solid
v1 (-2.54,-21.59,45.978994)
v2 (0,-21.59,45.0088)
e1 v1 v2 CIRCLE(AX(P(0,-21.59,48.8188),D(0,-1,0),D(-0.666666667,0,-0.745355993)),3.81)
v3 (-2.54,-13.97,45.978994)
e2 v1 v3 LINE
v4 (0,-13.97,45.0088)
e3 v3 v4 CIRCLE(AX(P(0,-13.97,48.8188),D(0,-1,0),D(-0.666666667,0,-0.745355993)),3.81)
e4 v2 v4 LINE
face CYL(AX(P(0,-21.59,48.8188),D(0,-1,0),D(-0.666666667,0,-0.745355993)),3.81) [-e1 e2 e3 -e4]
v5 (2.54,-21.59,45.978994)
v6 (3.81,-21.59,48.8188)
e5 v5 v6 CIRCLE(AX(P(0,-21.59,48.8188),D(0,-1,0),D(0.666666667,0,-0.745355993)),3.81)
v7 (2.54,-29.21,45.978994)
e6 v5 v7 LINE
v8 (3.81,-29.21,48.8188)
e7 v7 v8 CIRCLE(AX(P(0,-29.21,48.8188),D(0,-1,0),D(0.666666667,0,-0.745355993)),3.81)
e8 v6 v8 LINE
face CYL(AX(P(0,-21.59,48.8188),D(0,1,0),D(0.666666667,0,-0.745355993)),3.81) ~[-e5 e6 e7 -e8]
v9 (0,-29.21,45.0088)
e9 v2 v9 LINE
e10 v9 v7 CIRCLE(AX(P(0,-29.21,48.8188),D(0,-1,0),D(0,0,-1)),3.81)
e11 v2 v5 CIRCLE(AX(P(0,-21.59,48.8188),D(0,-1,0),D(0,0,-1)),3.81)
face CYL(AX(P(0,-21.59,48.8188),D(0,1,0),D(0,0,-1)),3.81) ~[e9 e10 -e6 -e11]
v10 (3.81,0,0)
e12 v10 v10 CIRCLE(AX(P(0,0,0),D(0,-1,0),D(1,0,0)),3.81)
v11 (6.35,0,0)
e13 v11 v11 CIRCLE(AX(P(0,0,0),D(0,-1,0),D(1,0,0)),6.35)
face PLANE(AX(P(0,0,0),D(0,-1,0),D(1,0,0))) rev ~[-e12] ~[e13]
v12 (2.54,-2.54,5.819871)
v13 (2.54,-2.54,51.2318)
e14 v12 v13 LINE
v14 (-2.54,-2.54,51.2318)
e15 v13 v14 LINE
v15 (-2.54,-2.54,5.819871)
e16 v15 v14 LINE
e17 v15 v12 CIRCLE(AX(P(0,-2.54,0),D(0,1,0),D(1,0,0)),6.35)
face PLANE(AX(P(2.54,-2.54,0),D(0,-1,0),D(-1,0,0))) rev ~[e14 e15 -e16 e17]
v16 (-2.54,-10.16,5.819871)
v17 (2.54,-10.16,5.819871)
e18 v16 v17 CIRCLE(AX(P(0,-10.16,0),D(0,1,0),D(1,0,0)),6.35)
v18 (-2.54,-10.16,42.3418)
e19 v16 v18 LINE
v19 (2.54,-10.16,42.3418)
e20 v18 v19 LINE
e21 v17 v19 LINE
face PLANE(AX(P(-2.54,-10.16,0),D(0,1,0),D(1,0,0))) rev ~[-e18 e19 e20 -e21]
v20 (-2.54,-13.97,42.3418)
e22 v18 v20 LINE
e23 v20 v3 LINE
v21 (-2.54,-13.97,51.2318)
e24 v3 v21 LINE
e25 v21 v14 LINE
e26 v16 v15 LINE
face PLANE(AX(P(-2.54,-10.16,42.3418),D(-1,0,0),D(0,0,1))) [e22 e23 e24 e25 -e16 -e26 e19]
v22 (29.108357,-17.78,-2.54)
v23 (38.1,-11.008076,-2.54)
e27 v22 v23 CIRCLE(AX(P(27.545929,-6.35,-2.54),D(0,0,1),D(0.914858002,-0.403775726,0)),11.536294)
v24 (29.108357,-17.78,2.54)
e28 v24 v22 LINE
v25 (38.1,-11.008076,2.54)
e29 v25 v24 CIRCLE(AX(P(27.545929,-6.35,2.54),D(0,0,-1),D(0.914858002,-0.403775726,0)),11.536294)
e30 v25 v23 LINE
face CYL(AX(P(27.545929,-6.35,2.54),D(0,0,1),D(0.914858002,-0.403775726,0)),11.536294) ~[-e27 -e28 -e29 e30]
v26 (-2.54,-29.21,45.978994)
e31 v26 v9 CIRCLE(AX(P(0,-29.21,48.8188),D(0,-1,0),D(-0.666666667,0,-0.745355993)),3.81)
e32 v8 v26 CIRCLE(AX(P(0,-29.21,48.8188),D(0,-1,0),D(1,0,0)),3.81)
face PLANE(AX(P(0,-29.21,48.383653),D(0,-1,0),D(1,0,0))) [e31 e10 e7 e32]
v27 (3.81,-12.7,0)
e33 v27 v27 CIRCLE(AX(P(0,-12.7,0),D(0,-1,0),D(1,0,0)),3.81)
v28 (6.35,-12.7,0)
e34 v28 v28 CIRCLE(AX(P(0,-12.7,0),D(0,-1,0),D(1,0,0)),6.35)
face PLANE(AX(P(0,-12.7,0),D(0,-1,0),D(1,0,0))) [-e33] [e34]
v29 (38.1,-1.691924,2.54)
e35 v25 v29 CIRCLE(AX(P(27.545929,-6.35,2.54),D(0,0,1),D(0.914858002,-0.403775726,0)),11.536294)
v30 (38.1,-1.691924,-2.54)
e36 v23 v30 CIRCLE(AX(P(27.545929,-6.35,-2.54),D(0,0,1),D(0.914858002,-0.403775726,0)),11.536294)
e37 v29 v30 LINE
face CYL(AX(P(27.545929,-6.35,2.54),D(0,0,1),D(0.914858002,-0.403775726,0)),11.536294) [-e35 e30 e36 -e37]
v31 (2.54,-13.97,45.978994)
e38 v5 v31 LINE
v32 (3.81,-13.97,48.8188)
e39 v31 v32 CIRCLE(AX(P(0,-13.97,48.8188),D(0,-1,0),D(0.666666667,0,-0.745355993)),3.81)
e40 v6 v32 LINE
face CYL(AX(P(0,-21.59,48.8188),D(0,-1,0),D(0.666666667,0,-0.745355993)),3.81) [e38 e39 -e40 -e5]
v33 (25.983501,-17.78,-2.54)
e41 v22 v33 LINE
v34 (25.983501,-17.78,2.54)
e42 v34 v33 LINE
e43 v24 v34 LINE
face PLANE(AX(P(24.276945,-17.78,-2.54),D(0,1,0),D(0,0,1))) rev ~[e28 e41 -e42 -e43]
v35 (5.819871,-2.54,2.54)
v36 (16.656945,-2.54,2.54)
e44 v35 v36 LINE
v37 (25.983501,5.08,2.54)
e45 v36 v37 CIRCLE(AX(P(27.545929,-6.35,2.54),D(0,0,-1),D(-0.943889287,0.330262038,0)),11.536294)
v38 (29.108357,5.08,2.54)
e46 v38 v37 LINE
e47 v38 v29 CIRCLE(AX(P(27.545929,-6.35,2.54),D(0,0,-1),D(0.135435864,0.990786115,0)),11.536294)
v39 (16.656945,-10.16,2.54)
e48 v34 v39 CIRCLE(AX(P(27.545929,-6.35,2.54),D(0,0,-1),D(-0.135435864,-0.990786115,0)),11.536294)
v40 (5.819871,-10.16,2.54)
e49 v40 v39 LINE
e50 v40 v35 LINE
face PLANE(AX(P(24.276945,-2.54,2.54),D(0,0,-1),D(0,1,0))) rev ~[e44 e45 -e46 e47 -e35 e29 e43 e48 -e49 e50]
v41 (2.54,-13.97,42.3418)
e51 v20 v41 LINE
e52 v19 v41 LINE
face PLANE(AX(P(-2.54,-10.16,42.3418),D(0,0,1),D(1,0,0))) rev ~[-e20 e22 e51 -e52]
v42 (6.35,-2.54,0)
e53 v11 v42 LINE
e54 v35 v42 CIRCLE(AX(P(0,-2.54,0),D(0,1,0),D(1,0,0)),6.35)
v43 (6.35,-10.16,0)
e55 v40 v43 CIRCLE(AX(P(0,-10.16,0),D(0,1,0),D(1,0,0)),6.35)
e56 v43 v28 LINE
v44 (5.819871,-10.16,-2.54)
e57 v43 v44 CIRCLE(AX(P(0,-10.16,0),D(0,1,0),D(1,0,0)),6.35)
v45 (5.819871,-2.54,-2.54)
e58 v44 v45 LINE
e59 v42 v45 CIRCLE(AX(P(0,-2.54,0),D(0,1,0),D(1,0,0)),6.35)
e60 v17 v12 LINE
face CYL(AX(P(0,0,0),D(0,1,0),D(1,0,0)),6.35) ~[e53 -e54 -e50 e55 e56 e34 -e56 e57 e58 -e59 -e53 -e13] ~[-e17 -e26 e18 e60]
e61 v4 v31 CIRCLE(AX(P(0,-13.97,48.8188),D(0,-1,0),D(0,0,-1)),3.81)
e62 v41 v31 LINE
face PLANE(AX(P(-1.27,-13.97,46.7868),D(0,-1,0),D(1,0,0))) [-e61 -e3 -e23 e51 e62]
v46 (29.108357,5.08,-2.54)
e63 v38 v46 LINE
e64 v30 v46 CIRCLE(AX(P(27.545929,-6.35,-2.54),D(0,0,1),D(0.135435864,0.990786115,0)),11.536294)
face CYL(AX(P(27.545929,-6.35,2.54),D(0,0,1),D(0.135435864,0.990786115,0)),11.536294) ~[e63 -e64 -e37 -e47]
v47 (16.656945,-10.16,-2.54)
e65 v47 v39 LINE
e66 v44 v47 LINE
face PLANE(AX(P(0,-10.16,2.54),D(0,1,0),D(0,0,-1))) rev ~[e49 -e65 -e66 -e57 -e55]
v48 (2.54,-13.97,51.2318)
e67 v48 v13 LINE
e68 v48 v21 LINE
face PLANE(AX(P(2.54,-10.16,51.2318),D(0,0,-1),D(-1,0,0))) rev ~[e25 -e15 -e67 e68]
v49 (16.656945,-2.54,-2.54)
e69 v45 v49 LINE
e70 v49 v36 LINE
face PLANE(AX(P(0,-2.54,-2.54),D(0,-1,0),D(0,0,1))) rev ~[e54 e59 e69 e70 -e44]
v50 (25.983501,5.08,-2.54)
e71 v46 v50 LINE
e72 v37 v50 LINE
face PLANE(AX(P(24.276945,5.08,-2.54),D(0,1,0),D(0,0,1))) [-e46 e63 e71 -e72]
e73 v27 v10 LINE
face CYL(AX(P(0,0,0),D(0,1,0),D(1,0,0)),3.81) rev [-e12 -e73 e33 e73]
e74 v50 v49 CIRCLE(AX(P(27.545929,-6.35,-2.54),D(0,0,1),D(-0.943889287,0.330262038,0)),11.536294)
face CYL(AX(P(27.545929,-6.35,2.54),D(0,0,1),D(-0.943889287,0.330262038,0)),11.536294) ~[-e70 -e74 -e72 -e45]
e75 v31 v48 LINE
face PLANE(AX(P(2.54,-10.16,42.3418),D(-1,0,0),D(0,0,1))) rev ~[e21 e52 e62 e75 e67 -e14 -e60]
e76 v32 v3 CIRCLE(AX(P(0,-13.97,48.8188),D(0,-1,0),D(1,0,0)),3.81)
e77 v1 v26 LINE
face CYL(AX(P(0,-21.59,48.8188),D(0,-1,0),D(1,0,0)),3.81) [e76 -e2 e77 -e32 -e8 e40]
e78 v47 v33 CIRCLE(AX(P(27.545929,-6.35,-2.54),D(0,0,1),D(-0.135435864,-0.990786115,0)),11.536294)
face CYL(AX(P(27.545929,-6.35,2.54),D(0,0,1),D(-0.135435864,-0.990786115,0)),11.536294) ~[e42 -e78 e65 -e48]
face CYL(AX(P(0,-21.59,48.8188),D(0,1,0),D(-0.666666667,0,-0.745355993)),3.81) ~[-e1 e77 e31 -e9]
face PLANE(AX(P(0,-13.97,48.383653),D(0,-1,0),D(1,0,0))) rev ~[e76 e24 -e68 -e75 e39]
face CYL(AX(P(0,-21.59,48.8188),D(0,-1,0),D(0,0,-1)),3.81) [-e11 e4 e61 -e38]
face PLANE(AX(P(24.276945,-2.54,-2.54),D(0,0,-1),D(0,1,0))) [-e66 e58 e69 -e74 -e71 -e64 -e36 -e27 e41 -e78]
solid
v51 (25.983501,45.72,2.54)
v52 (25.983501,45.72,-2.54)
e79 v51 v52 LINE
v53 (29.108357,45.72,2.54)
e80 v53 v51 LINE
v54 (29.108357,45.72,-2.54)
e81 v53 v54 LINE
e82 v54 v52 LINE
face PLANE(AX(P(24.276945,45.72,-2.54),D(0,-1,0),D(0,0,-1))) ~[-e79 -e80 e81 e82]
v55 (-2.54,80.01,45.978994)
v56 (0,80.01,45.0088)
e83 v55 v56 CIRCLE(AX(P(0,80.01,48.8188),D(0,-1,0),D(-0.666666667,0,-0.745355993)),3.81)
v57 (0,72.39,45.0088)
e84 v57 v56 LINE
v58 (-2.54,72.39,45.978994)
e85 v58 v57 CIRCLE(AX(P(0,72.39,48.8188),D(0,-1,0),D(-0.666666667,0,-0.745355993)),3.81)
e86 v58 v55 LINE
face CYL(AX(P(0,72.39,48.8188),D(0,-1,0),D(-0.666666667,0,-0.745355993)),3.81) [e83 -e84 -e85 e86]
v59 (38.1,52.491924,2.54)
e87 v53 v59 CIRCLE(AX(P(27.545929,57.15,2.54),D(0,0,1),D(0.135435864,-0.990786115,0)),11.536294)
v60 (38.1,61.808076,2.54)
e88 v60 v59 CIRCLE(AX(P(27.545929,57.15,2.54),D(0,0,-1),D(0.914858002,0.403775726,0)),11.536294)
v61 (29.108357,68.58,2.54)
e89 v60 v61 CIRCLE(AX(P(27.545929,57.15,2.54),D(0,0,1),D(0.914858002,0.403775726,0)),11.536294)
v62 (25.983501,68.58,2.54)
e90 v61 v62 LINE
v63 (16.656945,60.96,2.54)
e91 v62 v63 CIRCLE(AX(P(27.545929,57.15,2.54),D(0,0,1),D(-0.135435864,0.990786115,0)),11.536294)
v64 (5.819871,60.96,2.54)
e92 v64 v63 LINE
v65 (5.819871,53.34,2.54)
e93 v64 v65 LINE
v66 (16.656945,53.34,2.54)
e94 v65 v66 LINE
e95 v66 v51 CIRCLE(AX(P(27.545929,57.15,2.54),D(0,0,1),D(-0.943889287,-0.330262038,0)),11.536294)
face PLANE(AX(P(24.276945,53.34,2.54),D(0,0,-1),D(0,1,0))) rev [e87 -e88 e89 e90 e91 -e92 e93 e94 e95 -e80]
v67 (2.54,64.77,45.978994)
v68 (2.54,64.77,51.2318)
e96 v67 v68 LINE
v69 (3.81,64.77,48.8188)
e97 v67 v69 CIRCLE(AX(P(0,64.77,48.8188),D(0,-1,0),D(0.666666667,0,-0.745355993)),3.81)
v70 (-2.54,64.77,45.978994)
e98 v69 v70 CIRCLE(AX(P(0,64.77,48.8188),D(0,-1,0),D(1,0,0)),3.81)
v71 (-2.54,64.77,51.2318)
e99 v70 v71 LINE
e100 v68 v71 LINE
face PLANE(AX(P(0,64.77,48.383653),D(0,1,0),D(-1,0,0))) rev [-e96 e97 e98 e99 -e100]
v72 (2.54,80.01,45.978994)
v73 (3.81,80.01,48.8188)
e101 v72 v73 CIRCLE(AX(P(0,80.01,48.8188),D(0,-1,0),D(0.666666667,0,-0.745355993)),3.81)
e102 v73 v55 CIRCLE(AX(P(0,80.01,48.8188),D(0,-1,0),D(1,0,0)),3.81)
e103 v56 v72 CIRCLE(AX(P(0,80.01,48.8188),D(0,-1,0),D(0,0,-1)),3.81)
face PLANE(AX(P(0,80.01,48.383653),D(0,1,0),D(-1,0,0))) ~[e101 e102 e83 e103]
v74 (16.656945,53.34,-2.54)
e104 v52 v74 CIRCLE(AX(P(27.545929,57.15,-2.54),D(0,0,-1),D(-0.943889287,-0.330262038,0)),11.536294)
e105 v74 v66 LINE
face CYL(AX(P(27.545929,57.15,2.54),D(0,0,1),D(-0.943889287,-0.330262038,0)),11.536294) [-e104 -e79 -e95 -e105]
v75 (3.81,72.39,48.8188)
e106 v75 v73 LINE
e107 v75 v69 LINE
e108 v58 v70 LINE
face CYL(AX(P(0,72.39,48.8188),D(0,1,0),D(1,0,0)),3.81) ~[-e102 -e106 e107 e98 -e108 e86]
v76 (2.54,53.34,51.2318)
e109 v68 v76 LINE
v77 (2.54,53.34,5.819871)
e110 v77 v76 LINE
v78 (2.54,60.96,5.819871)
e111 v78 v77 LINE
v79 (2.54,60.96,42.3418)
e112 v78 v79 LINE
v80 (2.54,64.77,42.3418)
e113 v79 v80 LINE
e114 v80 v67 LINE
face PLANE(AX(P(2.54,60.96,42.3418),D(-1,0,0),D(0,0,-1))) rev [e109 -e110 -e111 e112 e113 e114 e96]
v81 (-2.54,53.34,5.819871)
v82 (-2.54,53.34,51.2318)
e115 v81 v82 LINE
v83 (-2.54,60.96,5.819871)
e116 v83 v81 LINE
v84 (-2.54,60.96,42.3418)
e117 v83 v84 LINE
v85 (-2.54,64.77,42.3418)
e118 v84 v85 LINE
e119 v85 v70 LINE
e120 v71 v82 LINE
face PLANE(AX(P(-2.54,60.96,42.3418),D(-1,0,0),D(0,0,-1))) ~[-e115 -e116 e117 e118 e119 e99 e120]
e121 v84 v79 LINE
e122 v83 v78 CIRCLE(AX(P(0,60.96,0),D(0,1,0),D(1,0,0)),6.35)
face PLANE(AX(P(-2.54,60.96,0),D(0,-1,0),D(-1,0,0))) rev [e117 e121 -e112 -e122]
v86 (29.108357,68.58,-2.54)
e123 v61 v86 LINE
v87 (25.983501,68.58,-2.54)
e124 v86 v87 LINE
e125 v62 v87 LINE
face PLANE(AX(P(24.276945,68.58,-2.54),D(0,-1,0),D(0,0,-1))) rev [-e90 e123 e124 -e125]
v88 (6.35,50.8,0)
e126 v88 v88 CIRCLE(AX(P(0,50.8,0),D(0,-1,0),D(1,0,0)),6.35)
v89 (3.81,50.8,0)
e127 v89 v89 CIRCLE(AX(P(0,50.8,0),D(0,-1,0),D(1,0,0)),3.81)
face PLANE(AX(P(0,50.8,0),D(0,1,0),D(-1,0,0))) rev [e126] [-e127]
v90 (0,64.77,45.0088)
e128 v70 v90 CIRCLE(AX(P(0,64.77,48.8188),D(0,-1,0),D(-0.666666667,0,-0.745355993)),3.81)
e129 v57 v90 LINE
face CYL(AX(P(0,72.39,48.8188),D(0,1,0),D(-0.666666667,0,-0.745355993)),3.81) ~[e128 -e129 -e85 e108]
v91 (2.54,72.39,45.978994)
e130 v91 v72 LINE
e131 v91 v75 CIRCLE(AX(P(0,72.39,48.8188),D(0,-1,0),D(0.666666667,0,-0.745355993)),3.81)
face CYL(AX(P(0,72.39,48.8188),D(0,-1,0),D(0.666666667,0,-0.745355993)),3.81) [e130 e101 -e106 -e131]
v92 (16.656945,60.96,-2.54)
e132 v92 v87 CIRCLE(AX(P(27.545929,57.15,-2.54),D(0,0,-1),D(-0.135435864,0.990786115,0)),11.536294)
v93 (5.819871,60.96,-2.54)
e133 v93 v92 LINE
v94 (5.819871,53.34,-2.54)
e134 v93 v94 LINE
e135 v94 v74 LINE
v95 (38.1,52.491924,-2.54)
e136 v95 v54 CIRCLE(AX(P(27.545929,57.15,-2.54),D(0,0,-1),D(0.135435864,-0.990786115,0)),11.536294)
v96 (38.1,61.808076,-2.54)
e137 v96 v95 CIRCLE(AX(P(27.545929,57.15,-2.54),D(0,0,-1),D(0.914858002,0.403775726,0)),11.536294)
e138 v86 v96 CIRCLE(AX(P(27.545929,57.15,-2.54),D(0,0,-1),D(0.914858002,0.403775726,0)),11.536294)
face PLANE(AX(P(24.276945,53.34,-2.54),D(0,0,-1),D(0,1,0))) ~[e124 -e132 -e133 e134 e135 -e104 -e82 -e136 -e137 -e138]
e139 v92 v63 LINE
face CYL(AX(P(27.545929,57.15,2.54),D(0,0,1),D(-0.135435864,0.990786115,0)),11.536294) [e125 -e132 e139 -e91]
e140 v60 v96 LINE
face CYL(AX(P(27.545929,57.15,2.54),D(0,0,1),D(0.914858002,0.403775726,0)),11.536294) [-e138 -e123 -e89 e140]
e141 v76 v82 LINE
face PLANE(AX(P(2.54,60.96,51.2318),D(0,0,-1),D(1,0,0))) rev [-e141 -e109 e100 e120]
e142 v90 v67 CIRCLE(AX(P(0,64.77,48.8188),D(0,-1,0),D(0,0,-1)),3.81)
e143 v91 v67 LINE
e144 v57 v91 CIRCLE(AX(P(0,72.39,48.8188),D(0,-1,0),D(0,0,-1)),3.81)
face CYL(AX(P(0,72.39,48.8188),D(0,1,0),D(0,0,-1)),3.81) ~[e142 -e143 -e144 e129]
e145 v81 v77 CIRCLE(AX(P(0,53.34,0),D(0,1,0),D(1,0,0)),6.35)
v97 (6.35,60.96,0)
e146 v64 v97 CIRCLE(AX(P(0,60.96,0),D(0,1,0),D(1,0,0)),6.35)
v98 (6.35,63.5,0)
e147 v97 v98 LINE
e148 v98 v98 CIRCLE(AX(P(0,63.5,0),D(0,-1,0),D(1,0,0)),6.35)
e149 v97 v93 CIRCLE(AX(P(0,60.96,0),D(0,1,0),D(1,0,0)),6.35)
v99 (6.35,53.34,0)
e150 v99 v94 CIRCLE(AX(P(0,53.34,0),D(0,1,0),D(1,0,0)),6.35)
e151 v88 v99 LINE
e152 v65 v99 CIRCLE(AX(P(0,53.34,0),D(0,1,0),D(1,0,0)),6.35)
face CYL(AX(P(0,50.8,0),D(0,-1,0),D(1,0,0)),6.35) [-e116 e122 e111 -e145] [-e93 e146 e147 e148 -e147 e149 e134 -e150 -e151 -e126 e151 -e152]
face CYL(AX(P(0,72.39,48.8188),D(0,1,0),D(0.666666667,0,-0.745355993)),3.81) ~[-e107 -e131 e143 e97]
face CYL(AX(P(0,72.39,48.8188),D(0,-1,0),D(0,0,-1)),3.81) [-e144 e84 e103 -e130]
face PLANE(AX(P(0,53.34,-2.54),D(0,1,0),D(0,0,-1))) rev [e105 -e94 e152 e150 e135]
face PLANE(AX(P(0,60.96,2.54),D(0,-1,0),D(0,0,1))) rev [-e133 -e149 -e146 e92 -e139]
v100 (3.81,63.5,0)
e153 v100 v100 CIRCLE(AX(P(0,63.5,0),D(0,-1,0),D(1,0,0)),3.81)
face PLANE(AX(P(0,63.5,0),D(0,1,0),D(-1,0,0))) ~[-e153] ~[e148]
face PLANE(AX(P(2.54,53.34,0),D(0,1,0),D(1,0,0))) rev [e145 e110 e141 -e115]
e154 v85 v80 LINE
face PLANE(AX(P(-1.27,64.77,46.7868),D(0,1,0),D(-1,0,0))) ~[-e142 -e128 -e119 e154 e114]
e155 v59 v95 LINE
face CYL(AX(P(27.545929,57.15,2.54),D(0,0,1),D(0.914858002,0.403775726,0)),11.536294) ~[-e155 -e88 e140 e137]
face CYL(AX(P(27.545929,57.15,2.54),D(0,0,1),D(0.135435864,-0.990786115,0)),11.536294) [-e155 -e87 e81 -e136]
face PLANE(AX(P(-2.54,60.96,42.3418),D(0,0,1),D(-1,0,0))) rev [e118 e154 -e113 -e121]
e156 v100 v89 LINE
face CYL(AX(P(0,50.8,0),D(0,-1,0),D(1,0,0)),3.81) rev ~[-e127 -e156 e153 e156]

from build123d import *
from build123d import SkipClean  # not in build123d's __all__

# Parameters (mm, degrees)
F0_R           = 6.35
F0_R_2         = 3.81
F1_DEPTH       = 12.7
F4_DEPTH       = 38.1
F5_DEPTH       = 25.4
F5_DEPTH_BACK  = 25.4
F6_W           = 13.8230553448
F6_H           = 5.08
F7_DEPTH       = 7.62
F7_DEPTH_BACK  = 15.24
F8_DEPTH       = 7.62
F9_DEPTH       = 7.62
F11_DEPTH      = 25.4
F12_DEPTH      = 5.08
F14_DEPTH      = 51.2318
F15_DEPTH      = 25.4
F16_W          = 2.54
F16_H          = 8.89
F17_DEPTH      = 11.43
F19_DEPTH      = 7.62
F19_DEPTH_BACK = 7.62
F20_DEPTH      = 7.62


with BuildPart() as f1:
    # F0 (on Front) → F1 (new body)
    with BuildSketch(Plane.XZ):
        Circle(F0_R)
        Circle(F0_R_2, mode=Mode.SUBTRACT)
    extrude(amount=F1_DEPTH)

    # F3 (on Right) → F4 (join)
    with BuildSketch(Plane.YZ):
        Polygon((-2.54, -2.54), (-2.54, 0), (-2.54, 2.54), (-10.16, 2.54), (-10.16, 0), (-10.16, -2.54), align=None)
    extrude(amount=F4_DEPTH)

    # F0 (on Front) → F5 (cut, two sides)
    with BuildSketch(Plane.XZ) as f5_sk:
        Circle(F0_R_2)
    extrude(amount=F5_DEPTH, mode=Mode.SUBTRACT)
    extrude(f5_sk.sketch, amount=-F5_DEPTH_BACK, mode=Mode.SUBTRACT)

    # F6 (on face) → F7 (join, two sides)
    with BuildSketch(Plane.XZ.offset(10.16)) as f7_sk:
        with Locations((31.1884723276, 0)):
            Rectangle(F6_W, F6_H)
    extrude(amount=F7_DEPTH)
    extrude(f7_sk.sketch, amount=-F7_DEPTH_BACK)

    # F8 (add): a face of the model
    f8_faces = [f1.faces().sort_by_distance(p)[0] for p in [
        (24.2769446552, -13.97, 0),
    ]]
    extrude(f8_faces, amount=F8_DEPTH)

    # F9 (add): a face of the model
    f9_faces = [f1.faces().sort_by_distance(p)[0] for p in [
        (24.2769446552, 1.27, 0),
    ]]
    extrude(f9_faces, amount=F9_DEPTH)

    # F10 (on face) → F11 (cut)
    with BuildSketch(Plane.XY.offset(2.54)):
        with BuildLine():
            ThreePointArc((25.9835010893, -17.78), (20.2469210754, -15.2836758241), (16.6569446552, -10.16))
            Line((16.6569446552, -10.16), (16.6569446552, -17.78))
            Line((16.6569446552, -17.78), (25.9835010893, -17.78))
        make_face()
        with BuildLine():
            Line((16.6569446552, 5.08), (16.6569446552, -2.54))
            ThreePointArc((16.6569446552, -2.54), (20.2469210754, 2.5836758241), (25.9835010893, 5.08))
            Line((25.9835010893, 5.08), (16.6569446552, 5.08))
        make_face()
        with BuildLine():
            Line((38.1, 5.08), (29.1083570088, 5.08))
            ThreePointArc((29.1083570088, 5.08), (34.4861831348, 2.8651480918), (38.1, -1.6919244863))
            Line((38.1, -1.6919244863), (38.1, 5.08))
        make_face()
        with BuildLine():
            Line((38.1, -17.78), (38.1, -11.0080755137))
            ThreePointArc((38.1, -11.0080755137), (34.4861831348, -15.5651480918), (29.1083570088, -17.78))
            Line((29.1083570088, -17.78), (38.1, -17.78))
        make_face()
    extrude(amount=-F11_DEPTH, mode=Mode.SUBTRACT)

    # F10 (on face) → F12 (join)
    with BuildSketch(Plane.XY.offset(2.54)):
        with BuildLine():
            ThreePointArc((38.1, -11.0080755137), (39.0822231303, -6.35), (38.1, -1.6919244863))
            Line((38.1, -1.6919244863), (38.1, -11.0080755137))
        make_face()
    with SkipClean():  # cleaning this boolean's faces spoils the solid; the shape is the same uncleaned
        extrude(amount=-F12_DEPTH)

    # F13 (on Top) → F14 (join)
    with BuildSketch(Plane.XY):
        Polygon((2.54, -2.54), (0, -2.54), (-2.54, -2.54), (-2.54, -10.16), (0, -10.16), (2.54, -10.16), align=None)
    extrude(amount=F14_DEPTH)

    # F0 (on Front) → F15 (cut)
    with BuildSketch(Plane.XZ):
        Circle(F0_R_2)
    extrude(amount=F15_DEPTH, mode=Mode.SUBTRACT)

    # F16 (on face) → F17 (join)
    with BuildSketch(Plane.XZ.offset(10.16)):
        with Locations((-1.27, 46.7868)):
            Rectangle(F16_W, F16_H)
        with Locations((1.27, 46.7868)):
            Rectangle(F16_W, F16_H)
    extrude(amount=F17_DEPTH)

    # F18 (on face) → F19 (join, two sides)
    with BuildSketch(Plane.XZ.offset(21.59)) as f19_sk:
        with BuildLine():
            Line((-2.54, 51.2318), (-2.54, 45.9789936686))
            ThreePointArc((-2.54, 45.9789936686), (-1.359492162, 45.2596033124), (0, 45.0088))
            ThreePointArc((0, 45.0088), (1.359492162, 45.2596033124), (2.54, 45.9789936686))
            Line((2.54, 45.9789936686), (2.54, 51.2318))
            Line((2.54, 51.2318), (-2.54, 51.2318))
        make_face()
        with BuildLine():
            ThreePointArc((2.54, 45.9789936686), (3.4780382402, 47.2633740133), (3.81, 48.8188))
            ThreePointArc((3.81, 48.8188), (-1.5554259867, 52.2968382402), (-2.54, 45.9789936686))
            Line((-2.54, 45.9789936686), (-2.54, 51.2318))
            Line((-2.54, 51.2318), (2.54, 51.2318))
            Line((2.54, 51.2318), (2.54, 45.9789936686))
        make_face()
    extrude(amount=F19_DEPTH)
    extrude(f19_sk.sketch, amount=-F19_DEPTH_BACK)

    # F20 (cut): a face of the model
    f20_faces = [f1.faces().sort_by_distance(p)[0] for p in [
        (0, -21.59, 43.8411826896),
    ]]
    extrude(f20_faces, amount=-F20_DEPTH, mode=Mode.SUBTRACT)


with BuildPart() as f22_1:
    # F22: instance of F1
    add(f1.part.mirror(Plane.XZ.offset(-25.4)), clean=False)


solid = Compound([f1.part, f22_1.part])
